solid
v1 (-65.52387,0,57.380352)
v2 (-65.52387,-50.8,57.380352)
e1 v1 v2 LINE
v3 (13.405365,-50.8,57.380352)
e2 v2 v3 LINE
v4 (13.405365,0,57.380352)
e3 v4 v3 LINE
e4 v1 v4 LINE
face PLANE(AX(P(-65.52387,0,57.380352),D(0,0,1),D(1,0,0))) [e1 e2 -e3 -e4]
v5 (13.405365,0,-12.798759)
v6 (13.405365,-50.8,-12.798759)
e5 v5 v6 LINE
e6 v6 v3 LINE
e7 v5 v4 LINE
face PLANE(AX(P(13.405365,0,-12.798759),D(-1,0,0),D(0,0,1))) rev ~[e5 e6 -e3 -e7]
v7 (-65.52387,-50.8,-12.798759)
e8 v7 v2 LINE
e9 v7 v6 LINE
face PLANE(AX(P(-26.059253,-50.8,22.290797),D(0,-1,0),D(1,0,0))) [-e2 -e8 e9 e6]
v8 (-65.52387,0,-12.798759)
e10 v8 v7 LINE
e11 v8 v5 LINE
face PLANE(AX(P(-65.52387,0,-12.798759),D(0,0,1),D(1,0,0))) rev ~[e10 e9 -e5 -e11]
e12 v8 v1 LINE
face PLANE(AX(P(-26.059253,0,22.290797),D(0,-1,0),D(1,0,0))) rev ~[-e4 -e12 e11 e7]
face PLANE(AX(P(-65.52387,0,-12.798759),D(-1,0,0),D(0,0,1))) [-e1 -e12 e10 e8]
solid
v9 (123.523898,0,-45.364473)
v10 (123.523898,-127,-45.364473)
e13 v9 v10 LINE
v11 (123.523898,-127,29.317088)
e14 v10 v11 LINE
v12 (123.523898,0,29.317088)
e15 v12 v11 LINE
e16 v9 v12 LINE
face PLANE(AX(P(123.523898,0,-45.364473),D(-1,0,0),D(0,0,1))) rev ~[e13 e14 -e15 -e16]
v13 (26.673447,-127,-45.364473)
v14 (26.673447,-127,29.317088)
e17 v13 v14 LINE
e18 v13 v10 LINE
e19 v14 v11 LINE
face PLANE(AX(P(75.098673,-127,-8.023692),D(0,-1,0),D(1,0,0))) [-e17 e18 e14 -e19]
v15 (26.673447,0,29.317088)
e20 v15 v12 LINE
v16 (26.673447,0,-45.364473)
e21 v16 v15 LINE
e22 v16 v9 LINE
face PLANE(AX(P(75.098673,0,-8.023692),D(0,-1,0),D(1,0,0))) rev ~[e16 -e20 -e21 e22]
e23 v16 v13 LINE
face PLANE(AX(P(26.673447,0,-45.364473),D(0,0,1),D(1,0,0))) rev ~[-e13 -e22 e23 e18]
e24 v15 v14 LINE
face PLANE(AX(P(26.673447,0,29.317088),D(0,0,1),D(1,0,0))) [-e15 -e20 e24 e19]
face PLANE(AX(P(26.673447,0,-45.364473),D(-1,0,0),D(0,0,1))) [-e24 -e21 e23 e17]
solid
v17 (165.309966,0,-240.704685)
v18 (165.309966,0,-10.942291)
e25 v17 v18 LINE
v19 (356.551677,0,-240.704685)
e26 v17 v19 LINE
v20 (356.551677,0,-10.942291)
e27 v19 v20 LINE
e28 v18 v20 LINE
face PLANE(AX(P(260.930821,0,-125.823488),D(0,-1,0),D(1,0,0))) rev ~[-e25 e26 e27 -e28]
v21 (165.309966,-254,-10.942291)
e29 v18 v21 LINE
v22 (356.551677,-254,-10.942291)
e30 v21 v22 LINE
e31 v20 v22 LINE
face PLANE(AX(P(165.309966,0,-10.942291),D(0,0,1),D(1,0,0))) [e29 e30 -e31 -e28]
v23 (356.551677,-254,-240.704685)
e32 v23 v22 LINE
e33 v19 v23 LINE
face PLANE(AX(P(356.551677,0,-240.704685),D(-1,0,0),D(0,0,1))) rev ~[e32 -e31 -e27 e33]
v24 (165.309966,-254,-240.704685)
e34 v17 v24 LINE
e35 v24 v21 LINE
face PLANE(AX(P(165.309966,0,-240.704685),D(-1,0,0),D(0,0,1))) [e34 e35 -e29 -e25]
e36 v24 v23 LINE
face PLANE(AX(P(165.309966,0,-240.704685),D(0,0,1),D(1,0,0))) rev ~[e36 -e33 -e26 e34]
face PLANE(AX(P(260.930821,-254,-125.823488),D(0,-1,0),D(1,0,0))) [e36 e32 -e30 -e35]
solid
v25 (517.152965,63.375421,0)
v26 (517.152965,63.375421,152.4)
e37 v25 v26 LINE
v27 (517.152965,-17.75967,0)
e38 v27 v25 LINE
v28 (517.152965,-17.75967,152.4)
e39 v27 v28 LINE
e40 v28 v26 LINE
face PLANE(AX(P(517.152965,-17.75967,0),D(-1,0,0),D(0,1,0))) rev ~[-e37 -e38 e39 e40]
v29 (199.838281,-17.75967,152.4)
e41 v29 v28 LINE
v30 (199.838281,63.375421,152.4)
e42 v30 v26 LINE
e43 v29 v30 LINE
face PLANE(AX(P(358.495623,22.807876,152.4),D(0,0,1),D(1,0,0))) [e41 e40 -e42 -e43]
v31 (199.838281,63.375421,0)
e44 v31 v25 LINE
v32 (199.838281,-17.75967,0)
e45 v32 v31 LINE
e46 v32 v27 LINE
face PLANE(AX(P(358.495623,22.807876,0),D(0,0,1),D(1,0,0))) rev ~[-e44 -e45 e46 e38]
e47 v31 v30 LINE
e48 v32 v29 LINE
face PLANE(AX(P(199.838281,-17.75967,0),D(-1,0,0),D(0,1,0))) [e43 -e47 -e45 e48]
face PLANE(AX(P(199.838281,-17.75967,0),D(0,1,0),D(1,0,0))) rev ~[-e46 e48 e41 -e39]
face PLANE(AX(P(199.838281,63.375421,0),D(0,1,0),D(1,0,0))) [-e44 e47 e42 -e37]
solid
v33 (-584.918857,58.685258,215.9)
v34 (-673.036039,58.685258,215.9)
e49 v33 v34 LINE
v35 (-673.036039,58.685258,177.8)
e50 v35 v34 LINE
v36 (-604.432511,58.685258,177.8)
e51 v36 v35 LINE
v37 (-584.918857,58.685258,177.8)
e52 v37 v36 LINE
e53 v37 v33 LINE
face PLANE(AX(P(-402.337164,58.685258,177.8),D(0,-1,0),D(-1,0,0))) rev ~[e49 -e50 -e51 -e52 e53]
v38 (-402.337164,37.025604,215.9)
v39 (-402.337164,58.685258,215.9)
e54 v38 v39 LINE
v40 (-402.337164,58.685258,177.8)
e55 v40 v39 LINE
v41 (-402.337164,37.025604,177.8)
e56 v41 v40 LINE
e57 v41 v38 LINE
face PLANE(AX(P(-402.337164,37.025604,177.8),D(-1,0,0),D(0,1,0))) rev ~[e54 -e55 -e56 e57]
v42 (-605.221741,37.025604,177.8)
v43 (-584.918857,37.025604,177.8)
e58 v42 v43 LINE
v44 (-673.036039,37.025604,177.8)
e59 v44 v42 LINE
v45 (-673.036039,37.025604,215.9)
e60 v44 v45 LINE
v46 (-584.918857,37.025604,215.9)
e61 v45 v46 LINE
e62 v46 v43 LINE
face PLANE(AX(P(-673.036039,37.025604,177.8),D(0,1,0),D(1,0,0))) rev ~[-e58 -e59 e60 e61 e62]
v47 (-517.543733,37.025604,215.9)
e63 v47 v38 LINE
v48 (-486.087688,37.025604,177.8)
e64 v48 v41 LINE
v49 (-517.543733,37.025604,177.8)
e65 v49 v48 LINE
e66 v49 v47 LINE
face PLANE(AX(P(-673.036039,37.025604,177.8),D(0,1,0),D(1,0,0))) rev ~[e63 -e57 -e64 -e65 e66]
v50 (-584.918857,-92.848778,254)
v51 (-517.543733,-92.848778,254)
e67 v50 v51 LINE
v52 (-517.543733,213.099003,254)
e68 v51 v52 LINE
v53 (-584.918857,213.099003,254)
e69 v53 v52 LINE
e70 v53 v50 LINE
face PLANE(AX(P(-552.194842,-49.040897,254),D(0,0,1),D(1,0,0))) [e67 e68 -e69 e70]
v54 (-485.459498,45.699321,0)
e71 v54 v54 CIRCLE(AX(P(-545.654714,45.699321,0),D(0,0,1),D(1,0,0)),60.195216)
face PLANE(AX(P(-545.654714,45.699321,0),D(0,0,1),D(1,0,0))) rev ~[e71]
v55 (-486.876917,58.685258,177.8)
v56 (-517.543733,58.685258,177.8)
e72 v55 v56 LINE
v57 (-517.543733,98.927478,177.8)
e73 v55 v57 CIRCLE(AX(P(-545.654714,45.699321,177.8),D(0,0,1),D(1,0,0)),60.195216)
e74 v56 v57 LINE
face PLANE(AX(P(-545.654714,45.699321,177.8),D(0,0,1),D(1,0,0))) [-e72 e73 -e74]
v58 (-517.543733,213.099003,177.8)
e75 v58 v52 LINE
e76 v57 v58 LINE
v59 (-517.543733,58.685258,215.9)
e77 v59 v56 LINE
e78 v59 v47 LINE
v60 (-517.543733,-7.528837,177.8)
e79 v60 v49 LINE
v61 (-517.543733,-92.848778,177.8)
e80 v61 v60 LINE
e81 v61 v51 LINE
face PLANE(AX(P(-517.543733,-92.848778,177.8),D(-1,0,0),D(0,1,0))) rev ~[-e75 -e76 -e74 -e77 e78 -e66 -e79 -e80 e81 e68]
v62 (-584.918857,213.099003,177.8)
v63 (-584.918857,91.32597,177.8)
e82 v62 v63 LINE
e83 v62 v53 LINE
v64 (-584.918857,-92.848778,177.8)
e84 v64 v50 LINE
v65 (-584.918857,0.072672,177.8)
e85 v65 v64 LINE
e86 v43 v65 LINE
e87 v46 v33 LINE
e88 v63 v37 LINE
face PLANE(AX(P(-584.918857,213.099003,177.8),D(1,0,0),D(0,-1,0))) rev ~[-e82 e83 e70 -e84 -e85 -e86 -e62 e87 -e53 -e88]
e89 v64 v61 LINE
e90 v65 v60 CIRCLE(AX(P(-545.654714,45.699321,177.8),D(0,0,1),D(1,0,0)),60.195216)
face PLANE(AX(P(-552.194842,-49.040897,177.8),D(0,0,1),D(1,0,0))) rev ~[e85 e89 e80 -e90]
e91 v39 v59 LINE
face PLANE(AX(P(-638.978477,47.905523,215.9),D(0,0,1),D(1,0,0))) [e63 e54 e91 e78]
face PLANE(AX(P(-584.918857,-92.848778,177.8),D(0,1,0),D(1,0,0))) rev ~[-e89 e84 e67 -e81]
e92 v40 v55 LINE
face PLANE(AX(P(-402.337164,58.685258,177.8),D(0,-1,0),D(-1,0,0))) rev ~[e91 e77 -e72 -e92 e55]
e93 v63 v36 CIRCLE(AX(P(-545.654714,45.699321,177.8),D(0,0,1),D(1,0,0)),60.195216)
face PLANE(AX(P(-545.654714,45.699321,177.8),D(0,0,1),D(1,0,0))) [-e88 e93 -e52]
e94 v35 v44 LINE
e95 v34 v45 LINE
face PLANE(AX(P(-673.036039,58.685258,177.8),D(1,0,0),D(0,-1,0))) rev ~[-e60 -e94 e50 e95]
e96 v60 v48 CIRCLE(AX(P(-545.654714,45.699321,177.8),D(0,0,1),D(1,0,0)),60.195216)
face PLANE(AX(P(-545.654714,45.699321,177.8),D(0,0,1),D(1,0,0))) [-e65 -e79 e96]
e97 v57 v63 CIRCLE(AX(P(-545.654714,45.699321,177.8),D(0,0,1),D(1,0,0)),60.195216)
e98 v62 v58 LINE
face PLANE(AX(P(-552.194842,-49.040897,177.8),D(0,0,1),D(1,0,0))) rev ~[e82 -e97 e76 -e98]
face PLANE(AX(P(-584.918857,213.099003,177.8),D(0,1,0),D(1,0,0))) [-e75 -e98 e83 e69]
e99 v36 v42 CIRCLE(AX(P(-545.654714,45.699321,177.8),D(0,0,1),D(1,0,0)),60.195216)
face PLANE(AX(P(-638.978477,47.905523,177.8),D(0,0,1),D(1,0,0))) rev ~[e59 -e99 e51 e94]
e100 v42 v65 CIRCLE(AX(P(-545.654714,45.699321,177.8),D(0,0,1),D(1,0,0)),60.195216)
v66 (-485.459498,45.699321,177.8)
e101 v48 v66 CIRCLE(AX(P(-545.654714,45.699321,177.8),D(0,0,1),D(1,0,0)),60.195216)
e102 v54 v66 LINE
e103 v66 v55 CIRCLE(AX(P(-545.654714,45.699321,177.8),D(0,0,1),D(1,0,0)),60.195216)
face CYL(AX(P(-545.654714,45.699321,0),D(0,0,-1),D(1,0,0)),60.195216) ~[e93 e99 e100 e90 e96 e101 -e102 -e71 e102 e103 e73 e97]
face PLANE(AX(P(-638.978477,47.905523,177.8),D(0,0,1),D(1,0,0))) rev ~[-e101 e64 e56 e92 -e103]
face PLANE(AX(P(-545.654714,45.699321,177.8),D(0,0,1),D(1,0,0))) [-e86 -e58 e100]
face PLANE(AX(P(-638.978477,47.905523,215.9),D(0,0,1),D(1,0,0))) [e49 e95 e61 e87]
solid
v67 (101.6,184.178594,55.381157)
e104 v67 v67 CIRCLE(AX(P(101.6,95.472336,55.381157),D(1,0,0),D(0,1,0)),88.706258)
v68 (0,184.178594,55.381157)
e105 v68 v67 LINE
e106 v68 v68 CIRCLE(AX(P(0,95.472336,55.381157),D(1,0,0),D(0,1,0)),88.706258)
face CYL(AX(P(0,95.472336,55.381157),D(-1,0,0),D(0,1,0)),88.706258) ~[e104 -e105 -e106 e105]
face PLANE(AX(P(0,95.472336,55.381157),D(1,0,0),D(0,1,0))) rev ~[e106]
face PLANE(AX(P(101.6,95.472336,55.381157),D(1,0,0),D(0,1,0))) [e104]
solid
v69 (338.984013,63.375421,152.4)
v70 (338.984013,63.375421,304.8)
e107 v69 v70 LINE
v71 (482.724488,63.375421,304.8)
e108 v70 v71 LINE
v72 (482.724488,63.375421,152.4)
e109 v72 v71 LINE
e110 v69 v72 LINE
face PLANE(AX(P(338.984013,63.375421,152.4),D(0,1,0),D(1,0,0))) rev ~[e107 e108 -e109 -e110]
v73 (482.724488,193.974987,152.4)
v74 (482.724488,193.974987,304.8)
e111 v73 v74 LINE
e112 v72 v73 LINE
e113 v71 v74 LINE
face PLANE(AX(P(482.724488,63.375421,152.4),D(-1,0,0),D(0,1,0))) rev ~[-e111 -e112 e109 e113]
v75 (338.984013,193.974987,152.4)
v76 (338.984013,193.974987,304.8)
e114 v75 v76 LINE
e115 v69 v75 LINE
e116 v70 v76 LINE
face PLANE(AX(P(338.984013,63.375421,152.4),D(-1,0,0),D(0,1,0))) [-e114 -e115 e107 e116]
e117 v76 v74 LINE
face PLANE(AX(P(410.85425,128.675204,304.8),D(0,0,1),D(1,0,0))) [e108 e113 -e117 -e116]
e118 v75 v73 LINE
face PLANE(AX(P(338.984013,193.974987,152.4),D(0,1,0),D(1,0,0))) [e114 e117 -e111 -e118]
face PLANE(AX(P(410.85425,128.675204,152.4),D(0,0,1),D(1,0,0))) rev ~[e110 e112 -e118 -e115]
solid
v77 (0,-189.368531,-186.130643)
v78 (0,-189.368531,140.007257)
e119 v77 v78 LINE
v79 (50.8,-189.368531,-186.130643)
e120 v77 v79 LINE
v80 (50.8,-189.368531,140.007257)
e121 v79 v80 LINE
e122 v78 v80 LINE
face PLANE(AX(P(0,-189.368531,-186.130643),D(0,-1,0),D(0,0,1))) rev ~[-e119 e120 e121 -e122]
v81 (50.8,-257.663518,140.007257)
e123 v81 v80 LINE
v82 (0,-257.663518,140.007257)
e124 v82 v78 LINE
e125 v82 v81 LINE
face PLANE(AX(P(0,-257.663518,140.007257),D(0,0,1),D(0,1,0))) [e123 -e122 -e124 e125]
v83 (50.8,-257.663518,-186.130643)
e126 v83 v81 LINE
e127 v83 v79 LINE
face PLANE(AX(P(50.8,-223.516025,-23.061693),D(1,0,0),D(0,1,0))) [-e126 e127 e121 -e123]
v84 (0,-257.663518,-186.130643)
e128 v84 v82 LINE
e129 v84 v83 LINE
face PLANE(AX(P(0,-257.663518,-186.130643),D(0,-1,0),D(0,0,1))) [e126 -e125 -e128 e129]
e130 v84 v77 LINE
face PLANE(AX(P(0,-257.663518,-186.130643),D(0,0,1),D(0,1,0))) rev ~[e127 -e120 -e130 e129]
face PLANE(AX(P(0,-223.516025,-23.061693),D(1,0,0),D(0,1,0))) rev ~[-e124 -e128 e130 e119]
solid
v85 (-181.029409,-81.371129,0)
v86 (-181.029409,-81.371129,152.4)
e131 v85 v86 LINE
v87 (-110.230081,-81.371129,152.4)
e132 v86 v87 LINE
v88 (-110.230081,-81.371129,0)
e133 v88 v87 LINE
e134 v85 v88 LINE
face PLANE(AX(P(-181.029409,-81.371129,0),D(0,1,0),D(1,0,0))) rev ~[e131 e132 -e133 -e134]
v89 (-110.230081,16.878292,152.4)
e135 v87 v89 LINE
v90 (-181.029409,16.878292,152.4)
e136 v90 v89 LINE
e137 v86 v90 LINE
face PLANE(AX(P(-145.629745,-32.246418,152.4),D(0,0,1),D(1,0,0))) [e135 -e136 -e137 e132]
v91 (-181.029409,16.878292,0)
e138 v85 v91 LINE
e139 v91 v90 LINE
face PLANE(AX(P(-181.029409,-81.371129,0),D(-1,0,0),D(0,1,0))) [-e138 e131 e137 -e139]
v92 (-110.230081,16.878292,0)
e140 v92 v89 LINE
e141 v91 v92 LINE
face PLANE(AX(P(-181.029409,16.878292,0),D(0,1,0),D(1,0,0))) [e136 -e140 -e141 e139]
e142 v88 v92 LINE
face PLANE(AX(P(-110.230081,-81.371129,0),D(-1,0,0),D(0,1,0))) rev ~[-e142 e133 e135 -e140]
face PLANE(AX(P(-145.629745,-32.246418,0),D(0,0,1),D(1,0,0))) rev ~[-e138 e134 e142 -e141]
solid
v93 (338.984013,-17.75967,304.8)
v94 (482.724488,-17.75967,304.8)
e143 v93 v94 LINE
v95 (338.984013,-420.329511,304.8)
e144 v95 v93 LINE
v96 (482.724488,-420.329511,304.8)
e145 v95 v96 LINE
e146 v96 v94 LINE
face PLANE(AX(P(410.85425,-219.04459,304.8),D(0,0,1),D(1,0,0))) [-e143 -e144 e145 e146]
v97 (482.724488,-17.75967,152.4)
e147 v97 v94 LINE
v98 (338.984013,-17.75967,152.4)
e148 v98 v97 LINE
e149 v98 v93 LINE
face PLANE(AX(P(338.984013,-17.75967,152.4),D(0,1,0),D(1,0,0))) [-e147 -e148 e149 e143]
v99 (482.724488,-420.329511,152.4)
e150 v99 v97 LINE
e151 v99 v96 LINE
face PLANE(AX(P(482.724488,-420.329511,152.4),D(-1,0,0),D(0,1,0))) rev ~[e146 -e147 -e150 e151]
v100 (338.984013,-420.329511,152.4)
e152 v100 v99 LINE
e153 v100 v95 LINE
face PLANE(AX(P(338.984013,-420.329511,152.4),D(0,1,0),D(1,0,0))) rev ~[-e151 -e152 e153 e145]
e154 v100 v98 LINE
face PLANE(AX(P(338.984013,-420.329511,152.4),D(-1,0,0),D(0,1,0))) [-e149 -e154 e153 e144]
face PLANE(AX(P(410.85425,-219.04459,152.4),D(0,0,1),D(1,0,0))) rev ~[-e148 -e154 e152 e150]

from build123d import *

# Parameters (mm, degrees)
F0_W      = 78.9292352274
F0_H      = 70.1791113243
F1_DEPTH  = 50.8
F2_W      = 96.850451082
F2_H      = 74.6815614402
F3_DEPTH  = 127
F4_W      = 70.7993283868
F4_H      = 98.2494205236
F5_DEPTH  = 152.4
F6_W      = 68.2949870825
F6_H      = 326.1379003525
F7_DEPTH  = 50.8
F8_R      = 88.7062581377
F9_DEPTH  = 101.6
F10_W     = 317.314684391
F10_H     = 81.1350904405
F11_DEPTH = 152.4
F12_W     = 191.2417113781
F12_H     = 229.7623949125
F13_DEPTH = 254
F14_R     = 60.1952157033
F15_DEPTH = 177.8
F17_DEPTH = 38.1
F18_W     = 67.3751235008
F18_H     = 176.0733984411
F19_DEPTH = 76.2
F20_W     = 143.7404751778
F20_H     = 130.599565804
F21_DEPTH = 152.4
F20_H_2   = 402.5698415935


# Not quite as in the source:
# - a feature names something its author has since deleted; it is built from what else it names


with BuildPart() as f1:
    # F0 (on Front) → F1 (new body)
    with BuildSketch(Plane.XZ):
        with Locations((-26.0592526756, 22.2907965071)):
            Rectangle(F0_W, F0_H)
    extrude(amount=F1_DEPTH)


with BuildPart() as f3:
    # F2 (on Front) → F3 (new body)
    with BuildSketch(Plane.XZ):
        with Locations((75.0986728817, -8.023692295)):
            Rectangle(F2_W, F2_H)
    extrude(amount=F3_DEPTH)


with BuildPart() as f5:
    # F4 (on Top) → F5 (new body)
    with BuildSketch(Plane.XY):
        with Locations((-145.6297449768, -32.2464182973)):
            Rectangle(F4_W, F4_H)
    extrude(amount=F5_DEPTH)


with BuildPart() as f7:
    # F6 (on Right) → F7 (new body)
    with BuildSketch(Plane.YZ):
        with Locations((-223.5160246491, -23.0616927147)):
            Rectangle(F6_W, F6_H)
    extrude(amount=F7_DEPTH)


with BuildPart() as f9:
    # F8 (on Right) → F9 (new body)
    with BuildSketch(Plane.YZ):
        with Locations((95.4723358154, 55.3811565042)):
            Circle(F8_R)
    extrude(amount=F9_DEPTH)


with BuildPart() as f11:
    # F10 (on Top) → F11 (new body)
    with BuildSketch(Plane.XY):
        with Locations((358.4956228733, 22.8078756481)):
            Rectangle(F10_W, F10_H)
    extrude(amount=F11_DEPTH)


with BuildPart() as f13:
    # F12 (on Front) → F13 (new body)
    with BuildSketch(Plane.XZ):
        with Locations((260.9308212996, -125.8234879933)):
            Rectangle(F12_W, F12_H)
    extrude(amount=F13_DEPTH)


with BuildPart() as f15:
    # F14 (on Top) → F15 (new body)
    with BuildSketch(Plane.XY):
        with Locations((-545.6547141075, 45.6993207335)):
            Circle(F14_R)
    extrude(amount=F15_DEPTH)

    # F16 (on face) → F17 (join)
    with BuildSketch(Plane.XY.offset(177.8)):
        with BuildLine():
            Line((-604.4325111577, 58.6852580309), (-673.0360388756, 58.6852580309))
            Line((-673.0360388756, 58.6852580309), (-673.0360388756, 37.0256043971))
            Line((-673.0360388756, 37.0256043971), (-605.221740544, 37.0256043971))
            ThreePointArc((-605.221740544, 37.0256043971), (-605.810008641, 47.8912452669), (-604.4325111577, 58.6852580309))
        make_face()
        with BuildLine():
            Line((-486.8769170573, 58.6852580309), (-604.4325111577, 58.6852580309))
            ThreePointArc((-604.4325111577, 58.6852580309), (-605.810008641, 47.8912452669), (-605.221740544, 37.0256043971))
            Line((-605.221740544, 37.0256043971), (-486.087687671, 37.0256043971))
            ThreePointArc((-486.087687671, 37.0256043971), (-485.6167511228, 41.3511033735), (-485.4594984042, 45.6993207335))
            ThreePointArc((-485.4594984042, 45.6993207335), (-485.814902253, 52.230852773), (-486.8769170573, 58.6852580309))
        make_face()
        with BuildLine():
            Line((-402.3371636868, 58.6852580309), (-486.8769170573, 58.6852580309))
            ThreePointArc((-486.8769170573, 58.6852580309), (-485.814902253, 52.230852773), (-485.4594984042, 45.6993207335))
            ThreePointArc((-485.4594984042, 45.6993207335), (-485.6167511228, 41.3511033735), (-486.087687671, 37.0256043971))
            Line((-486.087687671, 37.0256043971), (-402.3371636868, 37.0256043971))
            Line((-402.3371636868, 37.0256043971), (-402.3371636868, 58.6852580309))
        make_face()
    extrude(amount=F17_DEPTH)

    # F18 (on face) → F19 (join)
    with BuildSketch(Plane.XY.offset(177.8)):
        with BuildLine():
            Line((-584.9188566208, -92.848777771), (-517.54373312, -92.848777771))
            Line((-517.54373312, -92.848777771), (-517.54373312, -7.5288366785))
            ThreePointArc((-517.54373312, -7.5288366785), (-552.4033425041, -14.1163963342), (-584.9188566208, 0.0726716536))
            Line((-584.9188566208, 0.0726716536), (-584.9188566208, -92.848777771))
        make_face()
        with BuildLine():
            ThreePointArc((-584.9188566208, 0.0726716536), (-552.4033425041, -14.1163963342), (-517.54373312, -7.5288366785))
            Line((-517.54373312, -7.5288366785), (-517.54373312, 37.0256043971))
            Line((-517.54373312, 37.0256043971), (-584.9188566208, 37.0256043971))
            Line((-584.9188566208, 37.0256043971), (-584.9188566208, 0.0726716536))
        make_face()
        with Locations((-551.2312948704, 125.0623036176)):
            Rectangle(F18_W, F18_H)
    extrude(amount=F19_DEPTH)


with BuildPart() as f21:
    # F20 (on face) → F21 (new body)
    with BuildSketch(Plane.XY.offset(152.4)):
        with Locations((410.8542501926, 128.6752037704)):
            Rectangle(F20_W, F20_H)
    extrude(amount=F21_DEPTH)


with BuildPart() as f21b:
    # F20 (on face) → F21, piece 2 (new body)
    with BuildSketch(Plane.XY.offset(152.4)):
        with Locations((410.8542501926, -219.0445903689)):
            Rectangle(F20_W, F20_H_2)
    extrude(amount=F21_DEPTH)


solid = Compound([f1.part, f3.part, f5.part, f7.part, f9.part, f11.part, f13.part, f15.part, f21.part, f21b.part])
